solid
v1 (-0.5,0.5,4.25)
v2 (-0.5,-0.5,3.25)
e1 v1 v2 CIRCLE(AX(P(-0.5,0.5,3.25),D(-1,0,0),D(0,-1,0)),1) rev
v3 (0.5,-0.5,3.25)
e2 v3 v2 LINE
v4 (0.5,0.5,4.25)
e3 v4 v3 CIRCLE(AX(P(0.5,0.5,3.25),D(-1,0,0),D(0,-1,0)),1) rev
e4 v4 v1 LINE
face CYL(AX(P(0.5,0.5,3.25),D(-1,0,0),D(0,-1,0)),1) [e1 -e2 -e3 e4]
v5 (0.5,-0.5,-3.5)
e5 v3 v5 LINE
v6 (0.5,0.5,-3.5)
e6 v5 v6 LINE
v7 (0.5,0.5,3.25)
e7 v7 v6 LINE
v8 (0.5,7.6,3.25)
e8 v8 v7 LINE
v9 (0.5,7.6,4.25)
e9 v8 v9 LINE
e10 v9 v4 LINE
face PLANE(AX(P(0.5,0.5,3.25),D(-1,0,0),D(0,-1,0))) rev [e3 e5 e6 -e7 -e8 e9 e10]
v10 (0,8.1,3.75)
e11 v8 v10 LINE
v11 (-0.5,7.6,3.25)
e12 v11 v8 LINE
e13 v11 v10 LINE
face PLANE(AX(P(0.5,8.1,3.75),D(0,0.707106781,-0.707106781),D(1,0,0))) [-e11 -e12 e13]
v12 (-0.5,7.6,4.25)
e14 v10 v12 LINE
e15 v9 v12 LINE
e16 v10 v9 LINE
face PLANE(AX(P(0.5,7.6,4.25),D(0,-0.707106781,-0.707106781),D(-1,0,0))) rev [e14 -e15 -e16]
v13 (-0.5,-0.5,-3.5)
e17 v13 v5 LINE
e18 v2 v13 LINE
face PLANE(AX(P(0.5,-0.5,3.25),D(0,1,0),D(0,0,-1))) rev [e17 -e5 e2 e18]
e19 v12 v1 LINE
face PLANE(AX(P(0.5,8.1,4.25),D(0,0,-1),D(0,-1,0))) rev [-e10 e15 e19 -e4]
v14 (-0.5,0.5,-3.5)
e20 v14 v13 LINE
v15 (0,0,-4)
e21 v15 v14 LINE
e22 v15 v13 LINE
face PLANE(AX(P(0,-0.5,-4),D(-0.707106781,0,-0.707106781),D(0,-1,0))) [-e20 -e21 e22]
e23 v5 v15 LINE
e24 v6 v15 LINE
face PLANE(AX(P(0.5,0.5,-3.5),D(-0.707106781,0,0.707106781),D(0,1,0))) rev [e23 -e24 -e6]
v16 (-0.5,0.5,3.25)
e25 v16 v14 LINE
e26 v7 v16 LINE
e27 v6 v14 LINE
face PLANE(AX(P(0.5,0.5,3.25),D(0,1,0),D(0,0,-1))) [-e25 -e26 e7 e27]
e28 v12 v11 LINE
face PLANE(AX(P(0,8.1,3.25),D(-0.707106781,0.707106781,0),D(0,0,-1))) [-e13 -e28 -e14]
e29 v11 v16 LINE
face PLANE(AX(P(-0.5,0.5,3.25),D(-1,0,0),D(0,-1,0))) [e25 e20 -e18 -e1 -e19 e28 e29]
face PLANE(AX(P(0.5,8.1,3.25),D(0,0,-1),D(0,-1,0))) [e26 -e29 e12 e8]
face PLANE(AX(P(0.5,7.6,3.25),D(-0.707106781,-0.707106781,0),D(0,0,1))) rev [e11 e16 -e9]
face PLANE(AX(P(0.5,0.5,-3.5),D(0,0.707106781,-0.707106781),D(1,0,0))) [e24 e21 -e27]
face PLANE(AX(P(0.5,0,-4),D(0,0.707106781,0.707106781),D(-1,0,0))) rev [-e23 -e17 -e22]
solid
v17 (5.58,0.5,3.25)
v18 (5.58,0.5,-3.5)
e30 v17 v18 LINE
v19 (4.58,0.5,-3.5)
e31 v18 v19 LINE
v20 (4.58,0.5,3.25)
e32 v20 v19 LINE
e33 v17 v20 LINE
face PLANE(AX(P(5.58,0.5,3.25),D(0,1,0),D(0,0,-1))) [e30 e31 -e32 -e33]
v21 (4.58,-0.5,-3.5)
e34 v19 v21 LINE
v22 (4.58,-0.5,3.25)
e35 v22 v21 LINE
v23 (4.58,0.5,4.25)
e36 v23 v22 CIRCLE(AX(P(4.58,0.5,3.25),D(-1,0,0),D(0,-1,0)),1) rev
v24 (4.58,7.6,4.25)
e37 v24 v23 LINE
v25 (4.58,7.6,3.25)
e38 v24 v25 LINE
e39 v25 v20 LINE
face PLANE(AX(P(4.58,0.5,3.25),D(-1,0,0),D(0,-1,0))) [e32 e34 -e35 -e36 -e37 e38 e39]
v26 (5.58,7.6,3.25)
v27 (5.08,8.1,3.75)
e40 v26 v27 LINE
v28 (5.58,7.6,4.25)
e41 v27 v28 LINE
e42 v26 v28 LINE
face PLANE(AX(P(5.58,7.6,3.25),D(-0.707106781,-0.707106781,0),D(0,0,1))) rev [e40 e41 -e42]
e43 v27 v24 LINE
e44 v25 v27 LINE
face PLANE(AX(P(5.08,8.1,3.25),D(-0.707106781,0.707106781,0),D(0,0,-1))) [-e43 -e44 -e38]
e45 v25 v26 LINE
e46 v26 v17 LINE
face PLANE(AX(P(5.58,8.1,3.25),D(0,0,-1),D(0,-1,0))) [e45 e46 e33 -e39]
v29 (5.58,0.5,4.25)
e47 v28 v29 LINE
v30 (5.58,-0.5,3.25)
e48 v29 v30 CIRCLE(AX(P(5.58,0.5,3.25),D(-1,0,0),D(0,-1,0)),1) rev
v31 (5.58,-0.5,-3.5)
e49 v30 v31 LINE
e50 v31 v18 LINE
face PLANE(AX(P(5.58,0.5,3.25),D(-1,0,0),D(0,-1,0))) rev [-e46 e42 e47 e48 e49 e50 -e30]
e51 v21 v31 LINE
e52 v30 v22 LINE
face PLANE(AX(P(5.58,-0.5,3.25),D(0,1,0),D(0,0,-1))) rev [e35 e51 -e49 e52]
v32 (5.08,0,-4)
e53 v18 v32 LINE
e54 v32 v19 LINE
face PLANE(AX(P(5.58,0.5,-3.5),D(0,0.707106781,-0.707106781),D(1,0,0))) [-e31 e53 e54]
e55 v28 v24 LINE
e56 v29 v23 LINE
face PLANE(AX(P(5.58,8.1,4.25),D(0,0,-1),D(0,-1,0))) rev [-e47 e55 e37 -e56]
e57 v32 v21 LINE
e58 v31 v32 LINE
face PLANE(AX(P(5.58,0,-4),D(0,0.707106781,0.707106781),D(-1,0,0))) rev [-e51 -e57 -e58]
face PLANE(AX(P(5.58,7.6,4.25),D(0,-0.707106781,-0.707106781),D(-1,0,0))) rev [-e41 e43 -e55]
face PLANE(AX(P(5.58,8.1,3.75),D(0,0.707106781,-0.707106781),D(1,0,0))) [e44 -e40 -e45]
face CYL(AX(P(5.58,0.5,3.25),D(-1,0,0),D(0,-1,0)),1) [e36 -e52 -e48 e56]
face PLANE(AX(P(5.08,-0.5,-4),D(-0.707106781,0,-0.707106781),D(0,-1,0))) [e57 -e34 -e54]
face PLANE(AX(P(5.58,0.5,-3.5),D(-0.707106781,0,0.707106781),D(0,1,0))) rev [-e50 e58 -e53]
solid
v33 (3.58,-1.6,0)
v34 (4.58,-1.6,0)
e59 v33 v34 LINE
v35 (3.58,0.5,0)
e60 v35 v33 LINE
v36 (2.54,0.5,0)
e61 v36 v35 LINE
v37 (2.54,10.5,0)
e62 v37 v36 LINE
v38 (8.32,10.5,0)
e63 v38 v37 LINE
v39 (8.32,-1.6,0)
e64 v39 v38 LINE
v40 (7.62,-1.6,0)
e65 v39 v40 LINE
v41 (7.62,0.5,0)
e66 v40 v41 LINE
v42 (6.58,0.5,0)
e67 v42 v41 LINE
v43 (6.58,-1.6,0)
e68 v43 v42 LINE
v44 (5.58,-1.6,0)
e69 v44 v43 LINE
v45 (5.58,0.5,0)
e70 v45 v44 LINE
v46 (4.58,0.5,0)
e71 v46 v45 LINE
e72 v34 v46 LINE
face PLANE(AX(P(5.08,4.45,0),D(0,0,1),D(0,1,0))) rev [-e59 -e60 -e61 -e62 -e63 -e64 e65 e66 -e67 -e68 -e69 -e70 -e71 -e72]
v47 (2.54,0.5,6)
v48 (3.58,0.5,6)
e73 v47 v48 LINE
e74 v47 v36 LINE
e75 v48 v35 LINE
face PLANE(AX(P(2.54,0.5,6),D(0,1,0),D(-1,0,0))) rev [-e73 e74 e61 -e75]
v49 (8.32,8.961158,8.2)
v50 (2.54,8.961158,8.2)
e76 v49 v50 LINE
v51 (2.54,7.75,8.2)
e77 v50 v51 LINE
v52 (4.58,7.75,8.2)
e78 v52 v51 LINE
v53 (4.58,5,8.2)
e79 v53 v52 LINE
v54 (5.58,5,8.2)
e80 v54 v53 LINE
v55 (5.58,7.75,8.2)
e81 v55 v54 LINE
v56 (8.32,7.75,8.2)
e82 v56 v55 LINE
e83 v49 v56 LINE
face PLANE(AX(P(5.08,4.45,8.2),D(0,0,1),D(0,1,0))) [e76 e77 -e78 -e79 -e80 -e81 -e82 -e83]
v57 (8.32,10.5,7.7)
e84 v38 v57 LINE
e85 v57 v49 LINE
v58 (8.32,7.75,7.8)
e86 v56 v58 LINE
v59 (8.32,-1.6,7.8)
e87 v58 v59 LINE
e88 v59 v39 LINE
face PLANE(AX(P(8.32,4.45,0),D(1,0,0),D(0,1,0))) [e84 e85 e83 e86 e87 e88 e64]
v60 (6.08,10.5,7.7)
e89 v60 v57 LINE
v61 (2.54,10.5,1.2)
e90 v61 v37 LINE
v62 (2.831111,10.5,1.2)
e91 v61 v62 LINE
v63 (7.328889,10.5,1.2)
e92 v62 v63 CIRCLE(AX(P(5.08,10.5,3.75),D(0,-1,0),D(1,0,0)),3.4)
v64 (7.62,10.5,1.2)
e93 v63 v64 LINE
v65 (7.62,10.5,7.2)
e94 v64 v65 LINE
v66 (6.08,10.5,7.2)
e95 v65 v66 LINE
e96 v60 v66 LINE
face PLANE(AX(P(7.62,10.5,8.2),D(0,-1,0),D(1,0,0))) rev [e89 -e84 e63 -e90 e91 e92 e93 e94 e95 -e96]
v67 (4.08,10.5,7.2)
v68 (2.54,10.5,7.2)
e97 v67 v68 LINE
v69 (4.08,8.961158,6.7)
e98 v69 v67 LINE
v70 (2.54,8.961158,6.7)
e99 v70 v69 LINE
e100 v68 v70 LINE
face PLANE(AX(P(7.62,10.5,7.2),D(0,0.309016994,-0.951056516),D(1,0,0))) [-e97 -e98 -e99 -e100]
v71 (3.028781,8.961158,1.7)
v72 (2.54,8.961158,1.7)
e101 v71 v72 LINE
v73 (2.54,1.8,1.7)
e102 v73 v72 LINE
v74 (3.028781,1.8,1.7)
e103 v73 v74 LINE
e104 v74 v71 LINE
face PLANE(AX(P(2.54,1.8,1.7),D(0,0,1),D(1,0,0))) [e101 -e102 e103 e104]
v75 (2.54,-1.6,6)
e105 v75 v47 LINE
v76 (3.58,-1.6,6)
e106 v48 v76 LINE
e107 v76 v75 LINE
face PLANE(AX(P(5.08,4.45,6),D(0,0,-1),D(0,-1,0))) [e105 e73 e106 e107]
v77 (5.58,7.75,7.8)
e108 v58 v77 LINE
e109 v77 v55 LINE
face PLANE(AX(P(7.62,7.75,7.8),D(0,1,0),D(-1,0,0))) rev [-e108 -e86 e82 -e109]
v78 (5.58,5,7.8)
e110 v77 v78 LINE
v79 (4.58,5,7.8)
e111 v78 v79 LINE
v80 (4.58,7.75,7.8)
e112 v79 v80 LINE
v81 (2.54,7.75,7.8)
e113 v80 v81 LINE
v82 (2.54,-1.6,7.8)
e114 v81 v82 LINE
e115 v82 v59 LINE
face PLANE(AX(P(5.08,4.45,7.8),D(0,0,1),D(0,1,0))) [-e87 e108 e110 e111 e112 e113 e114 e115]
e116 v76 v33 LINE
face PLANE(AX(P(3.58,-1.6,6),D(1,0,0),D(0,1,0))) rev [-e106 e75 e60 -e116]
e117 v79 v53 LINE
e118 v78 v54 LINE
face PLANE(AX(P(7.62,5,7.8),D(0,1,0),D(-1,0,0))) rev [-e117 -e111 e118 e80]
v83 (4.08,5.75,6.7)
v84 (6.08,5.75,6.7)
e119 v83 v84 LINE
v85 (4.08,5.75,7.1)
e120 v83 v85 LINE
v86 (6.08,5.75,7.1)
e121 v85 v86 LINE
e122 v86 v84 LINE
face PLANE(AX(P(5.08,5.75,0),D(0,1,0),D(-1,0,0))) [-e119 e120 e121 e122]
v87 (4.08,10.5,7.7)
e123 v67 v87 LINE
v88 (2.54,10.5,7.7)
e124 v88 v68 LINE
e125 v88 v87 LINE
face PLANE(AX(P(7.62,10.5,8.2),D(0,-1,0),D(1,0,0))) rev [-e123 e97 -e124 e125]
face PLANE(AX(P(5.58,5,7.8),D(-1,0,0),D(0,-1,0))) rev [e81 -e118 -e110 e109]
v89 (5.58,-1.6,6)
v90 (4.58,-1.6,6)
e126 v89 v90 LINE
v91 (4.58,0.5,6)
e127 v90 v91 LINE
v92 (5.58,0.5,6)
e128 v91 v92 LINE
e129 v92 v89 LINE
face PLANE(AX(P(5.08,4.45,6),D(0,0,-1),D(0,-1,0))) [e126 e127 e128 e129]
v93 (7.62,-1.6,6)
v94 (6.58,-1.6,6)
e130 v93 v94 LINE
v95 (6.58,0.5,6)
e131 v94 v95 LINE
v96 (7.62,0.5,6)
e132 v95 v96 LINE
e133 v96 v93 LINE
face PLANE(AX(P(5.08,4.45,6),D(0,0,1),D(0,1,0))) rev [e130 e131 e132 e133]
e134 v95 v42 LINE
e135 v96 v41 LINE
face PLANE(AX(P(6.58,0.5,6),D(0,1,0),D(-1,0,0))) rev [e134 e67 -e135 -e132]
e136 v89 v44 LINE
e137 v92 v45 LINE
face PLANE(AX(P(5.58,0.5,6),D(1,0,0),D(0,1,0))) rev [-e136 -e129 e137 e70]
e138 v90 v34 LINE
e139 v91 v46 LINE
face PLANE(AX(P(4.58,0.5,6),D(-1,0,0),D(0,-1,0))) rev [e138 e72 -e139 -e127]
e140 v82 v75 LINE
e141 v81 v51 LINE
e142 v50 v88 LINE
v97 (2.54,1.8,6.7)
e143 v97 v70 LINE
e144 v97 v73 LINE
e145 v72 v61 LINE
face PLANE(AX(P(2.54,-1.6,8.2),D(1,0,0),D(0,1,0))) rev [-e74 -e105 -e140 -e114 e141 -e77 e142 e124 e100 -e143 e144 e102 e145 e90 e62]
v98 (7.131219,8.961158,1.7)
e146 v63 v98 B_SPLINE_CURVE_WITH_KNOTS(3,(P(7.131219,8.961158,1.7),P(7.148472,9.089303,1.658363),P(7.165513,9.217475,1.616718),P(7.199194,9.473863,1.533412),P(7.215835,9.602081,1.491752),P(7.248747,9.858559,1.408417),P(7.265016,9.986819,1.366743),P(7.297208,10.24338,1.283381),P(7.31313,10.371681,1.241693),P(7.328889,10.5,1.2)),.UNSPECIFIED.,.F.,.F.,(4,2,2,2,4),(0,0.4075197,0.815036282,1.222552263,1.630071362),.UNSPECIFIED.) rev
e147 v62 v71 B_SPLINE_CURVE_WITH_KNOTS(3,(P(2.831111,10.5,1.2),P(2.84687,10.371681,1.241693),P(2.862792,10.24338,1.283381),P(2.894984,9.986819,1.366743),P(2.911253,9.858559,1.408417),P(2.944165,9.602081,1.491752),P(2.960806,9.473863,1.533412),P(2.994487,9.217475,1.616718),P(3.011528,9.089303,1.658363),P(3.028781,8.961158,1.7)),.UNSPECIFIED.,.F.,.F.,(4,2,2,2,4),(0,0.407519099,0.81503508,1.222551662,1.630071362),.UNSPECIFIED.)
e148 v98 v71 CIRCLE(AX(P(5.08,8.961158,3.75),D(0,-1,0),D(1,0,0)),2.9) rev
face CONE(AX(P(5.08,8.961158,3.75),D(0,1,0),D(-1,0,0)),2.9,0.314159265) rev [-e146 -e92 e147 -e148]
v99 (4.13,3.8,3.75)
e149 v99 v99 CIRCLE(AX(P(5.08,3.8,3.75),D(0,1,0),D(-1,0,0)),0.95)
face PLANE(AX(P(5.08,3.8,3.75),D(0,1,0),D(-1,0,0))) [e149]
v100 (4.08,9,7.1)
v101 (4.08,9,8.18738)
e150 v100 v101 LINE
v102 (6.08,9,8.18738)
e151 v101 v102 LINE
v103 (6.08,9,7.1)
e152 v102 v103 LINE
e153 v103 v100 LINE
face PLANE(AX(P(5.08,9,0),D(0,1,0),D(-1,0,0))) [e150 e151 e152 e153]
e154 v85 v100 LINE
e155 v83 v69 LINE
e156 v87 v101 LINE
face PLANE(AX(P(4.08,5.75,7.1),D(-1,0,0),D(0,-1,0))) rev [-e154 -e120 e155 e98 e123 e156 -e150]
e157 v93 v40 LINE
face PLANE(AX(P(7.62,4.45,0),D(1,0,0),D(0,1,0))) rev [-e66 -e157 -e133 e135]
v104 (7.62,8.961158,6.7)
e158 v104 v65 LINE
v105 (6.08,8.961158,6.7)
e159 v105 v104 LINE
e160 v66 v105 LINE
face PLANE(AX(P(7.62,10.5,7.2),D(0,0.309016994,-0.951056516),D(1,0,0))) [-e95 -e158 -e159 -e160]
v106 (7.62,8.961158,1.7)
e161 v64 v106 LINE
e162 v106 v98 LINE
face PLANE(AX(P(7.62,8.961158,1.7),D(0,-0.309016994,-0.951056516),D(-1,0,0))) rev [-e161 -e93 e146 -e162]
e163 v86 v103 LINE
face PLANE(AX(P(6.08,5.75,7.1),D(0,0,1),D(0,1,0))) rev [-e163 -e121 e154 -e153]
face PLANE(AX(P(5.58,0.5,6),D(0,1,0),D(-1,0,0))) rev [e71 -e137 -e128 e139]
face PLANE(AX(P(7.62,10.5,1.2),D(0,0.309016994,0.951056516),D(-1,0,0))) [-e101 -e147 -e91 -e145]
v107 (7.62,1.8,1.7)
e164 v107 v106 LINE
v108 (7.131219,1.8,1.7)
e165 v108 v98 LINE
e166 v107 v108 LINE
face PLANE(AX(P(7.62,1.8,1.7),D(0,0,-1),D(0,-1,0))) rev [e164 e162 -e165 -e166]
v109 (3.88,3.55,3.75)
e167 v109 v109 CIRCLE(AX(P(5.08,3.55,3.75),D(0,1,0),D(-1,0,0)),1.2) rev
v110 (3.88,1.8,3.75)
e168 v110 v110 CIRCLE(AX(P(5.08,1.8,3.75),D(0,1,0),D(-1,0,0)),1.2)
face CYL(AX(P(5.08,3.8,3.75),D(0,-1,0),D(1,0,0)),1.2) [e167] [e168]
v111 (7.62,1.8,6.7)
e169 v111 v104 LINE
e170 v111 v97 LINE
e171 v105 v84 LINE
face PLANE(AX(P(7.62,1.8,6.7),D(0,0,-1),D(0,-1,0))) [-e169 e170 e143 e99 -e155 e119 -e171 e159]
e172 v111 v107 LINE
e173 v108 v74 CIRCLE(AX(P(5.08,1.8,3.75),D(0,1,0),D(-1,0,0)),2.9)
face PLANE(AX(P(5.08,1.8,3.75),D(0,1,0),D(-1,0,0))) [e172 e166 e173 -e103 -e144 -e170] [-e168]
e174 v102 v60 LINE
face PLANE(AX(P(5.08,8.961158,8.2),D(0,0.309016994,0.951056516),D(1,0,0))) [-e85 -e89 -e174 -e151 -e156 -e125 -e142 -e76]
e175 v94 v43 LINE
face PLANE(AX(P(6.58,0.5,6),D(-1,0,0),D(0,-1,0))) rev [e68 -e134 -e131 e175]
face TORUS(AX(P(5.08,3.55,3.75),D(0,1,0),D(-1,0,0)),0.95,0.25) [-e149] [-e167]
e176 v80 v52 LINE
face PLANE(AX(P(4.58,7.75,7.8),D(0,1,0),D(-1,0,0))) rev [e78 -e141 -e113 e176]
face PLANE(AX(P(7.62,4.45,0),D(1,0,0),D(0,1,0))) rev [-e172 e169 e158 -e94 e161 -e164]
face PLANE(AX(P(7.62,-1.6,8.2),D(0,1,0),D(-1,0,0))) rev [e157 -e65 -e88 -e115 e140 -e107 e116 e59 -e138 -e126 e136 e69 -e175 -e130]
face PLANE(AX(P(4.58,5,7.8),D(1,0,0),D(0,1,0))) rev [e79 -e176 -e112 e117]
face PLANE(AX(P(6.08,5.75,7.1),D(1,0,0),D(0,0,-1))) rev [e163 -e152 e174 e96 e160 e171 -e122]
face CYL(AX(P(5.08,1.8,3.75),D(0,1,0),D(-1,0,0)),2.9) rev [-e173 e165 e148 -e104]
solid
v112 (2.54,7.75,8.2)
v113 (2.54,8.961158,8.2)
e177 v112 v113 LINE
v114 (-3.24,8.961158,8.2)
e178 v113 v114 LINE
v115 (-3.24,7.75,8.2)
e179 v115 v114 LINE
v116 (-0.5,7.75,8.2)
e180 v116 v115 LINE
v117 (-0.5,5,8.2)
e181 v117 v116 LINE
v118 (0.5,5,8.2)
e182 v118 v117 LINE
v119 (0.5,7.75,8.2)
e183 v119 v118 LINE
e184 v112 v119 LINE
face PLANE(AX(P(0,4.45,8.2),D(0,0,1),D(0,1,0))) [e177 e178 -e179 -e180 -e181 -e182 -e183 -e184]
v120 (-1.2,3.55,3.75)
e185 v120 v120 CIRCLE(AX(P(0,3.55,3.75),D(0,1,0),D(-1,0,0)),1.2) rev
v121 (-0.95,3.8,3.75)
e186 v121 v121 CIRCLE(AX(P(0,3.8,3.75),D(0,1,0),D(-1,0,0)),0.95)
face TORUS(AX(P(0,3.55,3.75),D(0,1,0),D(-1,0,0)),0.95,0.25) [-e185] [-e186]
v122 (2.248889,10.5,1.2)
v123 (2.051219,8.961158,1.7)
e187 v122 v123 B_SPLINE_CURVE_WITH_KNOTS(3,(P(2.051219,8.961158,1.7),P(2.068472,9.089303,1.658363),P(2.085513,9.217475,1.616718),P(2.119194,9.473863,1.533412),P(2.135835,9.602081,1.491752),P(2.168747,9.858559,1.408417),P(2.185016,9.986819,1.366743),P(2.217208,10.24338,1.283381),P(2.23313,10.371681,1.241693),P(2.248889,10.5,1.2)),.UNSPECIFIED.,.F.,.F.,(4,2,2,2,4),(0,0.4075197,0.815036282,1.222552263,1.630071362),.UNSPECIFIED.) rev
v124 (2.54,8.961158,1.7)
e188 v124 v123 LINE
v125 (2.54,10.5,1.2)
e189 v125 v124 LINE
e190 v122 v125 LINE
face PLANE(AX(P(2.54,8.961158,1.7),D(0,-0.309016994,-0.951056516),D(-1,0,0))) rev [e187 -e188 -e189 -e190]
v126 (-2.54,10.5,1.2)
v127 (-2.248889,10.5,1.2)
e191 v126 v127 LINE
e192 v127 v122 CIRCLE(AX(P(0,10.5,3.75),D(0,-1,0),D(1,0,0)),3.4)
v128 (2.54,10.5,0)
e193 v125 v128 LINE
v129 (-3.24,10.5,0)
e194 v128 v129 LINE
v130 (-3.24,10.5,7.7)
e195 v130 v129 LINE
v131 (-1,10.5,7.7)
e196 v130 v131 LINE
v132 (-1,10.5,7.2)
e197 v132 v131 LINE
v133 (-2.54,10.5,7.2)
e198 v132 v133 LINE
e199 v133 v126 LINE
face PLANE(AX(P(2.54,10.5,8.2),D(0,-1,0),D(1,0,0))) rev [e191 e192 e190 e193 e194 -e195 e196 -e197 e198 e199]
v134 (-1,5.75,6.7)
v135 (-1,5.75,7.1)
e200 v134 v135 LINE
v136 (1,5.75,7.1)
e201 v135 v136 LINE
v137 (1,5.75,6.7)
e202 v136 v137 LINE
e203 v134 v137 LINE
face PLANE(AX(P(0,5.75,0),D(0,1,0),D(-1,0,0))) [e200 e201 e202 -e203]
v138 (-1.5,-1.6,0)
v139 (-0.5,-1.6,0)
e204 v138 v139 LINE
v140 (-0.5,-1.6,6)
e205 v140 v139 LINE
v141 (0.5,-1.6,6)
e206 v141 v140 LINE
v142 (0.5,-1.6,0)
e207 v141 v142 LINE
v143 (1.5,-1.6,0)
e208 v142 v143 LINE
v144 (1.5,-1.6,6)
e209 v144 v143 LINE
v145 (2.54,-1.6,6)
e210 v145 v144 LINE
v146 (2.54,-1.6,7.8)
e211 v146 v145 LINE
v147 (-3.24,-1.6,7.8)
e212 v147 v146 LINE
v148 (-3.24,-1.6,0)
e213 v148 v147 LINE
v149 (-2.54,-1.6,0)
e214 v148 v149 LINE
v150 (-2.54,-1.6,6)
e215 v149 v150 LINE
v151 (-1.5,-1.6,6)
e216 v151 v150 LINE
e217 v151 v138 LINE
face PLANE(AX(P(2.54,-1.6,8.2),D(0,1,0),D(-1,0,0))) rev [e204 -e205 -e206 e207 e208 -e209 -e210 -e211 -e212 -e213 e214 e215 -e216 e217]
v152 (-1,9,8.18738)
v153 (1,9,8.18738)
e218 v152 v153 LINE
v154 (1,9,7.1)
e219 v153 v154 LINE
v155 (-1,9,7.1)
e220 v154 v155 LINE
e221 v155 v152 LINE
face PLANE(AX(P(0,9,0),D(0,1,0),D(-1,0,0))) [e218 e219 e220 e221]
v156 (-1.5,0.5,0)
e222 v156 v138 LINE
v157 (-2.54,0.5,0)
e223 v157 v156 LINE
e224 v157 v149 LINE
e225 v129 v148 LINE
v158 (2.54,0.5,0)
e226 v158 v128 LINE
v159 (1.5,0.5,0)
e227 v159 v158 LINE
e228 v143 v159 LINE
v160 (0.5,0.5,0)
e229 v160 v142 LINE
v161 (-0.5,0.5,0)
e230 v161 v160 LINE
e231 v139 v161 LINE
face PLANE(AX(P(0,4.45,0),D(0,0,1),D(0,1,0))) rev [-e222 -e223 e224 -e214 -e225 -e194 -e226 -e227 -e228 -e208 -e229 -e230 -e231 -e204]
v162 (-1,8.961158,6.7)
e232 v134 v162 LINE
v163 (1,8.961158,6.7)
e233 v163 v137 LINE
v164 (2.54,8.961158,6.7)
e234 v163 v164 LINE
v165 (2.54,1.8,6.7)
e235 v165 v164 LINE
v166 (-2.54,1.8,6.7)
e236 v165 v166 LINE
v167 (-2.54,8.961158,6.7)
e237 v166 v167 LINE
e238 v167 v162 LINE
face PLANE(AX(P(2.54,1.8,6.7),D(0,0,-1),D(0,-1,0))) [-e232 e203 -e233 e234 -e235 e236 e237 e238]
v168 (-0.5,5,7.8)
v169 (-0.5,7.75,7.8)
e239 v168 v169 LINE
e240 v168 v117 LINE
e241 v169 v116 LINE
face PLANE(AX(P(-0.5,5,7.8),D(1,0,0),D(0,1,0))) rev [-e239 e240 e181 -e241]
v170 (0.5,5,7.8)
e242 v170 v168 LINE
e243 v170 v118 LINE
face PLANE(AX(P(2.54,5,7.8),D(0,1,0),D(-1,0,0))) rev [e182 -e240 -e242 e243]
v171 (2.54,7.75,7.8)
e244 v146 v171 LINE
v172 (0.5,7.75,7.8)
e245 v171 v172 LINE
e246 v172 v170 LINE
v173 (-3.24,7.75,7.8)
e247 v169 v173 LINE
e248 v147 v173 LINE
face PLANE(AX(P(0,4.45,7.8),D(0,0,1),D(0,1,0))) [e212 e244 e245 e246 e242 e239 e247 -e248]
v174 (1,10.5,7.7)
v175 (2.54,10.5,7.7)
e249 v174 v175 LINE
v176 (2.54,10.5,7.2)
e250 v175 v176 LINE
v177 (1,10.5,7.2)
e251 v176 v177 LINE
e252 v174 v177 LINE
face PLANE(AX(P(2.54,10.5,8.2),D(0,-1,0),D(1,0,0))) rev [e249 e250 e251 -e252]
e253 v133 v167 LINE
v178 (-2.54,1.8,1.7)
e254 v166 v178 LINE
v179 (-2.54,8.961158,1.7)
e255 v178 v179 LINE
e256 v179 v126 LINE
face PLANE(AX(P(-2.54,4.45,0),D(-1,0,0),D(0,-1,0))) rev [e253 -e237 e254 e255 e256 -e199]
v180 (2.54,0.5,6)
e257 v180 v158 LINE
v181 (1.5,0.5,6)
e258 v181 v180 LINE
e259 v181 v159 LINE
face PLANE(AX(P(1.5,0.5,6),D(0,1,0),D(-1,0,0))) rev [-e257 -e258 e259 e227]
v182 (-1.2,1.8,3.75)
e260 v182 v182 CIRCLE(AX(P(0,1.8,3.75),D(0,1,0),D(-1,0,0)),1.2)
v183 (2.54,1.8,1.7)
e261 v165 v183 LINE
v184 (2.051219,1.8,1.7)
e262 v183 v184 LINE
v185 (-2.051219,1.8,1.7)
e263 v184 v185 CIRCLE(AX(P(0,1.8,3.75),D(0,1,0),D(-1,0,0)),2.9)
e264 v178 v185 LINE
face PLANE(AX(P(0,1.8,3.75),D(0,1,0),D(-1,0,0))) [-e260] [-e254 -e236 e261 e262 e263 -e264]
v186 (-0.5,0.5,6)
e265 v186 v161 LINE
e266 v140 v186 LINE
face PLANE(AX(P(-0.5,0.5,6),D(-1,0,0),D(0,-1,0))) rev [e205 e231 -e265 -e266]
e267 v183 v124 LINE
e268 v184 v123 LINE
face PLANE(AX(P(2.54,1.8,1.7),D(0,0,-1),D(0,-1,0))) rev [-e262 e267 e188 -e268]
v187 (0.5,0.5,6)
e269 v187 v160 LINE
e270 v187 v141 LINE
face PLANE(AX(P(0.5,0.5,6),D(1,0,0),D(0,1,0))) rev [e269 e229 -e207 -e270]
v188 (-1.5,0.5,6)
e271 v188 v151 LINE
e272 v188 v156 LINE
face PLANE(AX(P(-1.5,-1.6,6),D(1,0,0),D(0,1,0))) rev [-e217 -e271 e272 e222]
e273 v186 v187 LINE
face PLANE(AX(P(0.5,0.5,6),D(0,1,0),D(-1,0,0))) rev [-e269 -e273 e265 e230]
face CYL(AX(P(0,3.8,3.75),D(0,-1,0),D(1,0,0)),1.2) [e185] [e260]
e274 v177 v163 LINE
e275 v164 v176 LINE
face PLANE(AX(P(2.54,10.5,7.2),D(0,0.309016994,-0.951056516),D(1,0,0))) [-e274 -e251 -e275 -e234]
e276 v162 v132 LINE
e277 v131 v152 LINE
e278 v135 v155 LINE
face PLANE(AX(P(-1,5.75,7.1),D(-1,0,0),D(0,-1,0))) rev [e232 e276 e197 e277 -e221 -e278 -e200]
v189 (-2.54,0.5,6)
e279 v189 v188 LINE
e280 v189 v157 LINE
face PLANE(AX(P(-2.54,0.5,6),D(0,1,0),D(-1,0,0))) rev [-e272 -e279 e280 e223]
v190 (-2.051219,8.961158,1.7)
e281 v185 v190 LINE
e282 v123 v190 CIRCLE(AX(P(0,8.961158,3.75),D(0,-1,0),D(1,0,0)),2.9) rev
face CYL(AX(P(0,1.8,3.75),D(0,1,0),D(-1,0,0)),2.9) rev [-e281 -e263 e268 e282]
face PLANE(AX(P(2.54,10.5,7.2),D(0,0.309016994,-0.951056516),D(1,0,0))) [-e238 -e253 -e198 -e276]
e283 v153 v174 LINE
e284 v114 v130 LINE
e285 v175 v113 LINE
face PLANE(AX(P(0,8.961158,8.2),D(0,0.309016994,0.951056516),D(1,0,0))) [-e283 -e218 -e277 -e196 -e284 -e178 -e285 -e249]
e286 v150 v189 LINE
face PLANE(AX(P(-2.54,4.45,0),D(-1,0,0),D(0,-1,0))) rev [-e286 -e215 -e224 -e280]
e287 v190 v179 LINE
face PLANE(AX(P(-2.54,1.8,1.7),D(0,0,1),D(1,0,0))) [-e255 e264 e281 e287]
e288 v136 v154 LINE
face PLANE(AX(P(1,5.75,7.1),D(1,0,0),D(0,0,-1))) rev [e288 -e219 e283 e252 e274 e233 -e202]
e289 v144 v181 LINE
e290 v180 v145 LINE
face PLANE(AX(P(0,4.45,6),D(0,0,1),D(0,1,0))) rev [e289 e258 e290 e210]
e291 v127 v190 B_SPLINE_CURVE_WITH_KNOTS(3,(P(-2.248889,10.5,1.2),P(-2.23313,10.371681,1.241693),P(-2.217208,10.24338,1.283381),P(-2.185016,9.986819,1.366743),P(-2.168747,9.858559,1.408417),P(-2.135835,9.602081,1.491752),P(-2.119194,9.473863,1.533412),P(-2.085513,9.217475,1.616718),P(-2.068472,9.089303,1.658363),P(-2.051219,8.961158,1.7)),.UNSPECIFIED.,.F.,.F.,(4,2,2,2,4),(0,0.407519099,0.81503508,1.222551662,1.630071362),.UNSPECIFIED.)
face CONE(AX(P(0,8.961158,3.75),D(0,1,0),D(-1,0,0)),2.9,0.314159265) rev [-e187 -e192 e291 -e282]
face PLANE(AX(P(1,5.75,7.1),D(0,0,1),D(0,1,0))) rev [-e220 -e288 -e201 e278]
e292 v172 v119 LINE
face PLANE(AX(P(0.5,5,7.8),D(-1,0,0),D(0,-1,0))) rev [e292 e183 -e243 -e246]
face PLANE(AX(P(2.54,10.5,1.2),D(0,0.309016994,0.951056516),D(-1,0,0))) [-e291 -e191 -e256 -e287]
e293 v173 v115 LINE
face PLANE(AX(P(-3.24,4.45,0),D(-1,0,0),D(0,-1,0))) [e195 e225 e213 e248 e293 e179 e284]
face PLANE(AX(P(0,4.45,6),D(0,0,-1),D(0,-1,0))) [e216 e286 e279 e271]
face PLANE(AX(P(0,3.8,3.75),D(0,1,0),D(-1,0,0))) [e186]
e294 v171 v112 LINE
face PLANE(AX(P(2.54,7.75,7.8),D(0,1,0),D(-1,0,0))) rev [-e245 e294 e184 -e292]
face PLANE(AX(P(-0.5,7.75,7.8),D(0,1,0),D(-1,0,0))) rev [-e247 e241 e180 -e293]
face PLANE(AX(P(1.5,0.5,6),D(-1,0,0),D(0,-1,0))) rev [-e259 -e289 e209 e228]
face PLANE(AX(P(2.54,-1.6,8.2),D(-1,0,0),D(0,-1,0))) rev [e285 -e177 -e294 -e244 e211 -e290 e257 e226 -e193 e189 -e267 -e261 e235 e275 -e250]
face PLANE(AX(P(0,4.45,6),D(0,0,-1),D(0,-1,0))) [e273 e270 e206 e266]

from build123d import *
from OCP.BRepFilletAPI import BRepFilletAPI_MakeChamfer

# Parameters (mm, degrees)
SKETCH_1_W             = 5.08
SKETCH_1_H             = 12.1
EXTRUDE_1_DEPTH        = 8.2
CUT_EXTRUDE_1_DEPTH    = 8.7
SKETCH_3_R             = 1.2
EXTRUDE_2_DEPTH        = 2
FILLET_1_R             = 0.25
CHAMFER_1_SIZE         = 0.5
CHAMFER_1_SIZE2        = 1.538841769
SKETCH_4_W             = 2
SKETCH_4_H             = 1.010953213
CUT_EXTRUDE_2_DEPTH    = 4.75
SKETCH_5_W             = 2
SKETCH_5_H             = 1.705458635
CUT_EXTRUDE_3_DEPTH    = 1.5
CHAMFER_2_SIZE         = 0.5
CHAMFER_2_SIZE2        = 1.538841769
SKETCH_6_W             = 5.08
SKETCH_6_H             = 6.6
CUT_EXTRUDE_4_DEPTH    = 0.4
SKETCH_7_W             = 2.04
SKETCH_7_H             = 2.75
CUT_EXTRUDE_5_DEPTH    = 0.4
EXTRUDE_1_2_DEPTH      = 0.5
EXTRUDE_1_2_DEPTH_BACK = 0.5
CHAMFER_3_SIZE         = 0.5
SKETCH_9_W             = 1
SKETCH_9_H             = 2.1
SKETCH_9_W_2           = 1.04
CUT_EXTRUDE_6_DEPTH    = 6
PATTERN_LINEAR_1_COUNT = 2
PATTERN_LINEAR_1_PITCH = 5.08
EXTRUDE_3_DEPTH        = 0.7
EXTRUDE_4_DEPTH        = 0.7
MOVE_BODY_1_ANGLE      = 180


with BuildPart() as part:
    # Эскиз1 → Extrude 1 (new body)
    with BuildSketch(Plane(origin=(0, 0, 0), x_dir=(1, 0, 0), z_dir=(0, 1, 0))):
        Rectangle(SKETCH_1_W, SKETCH_1_H)
    extrude(amount=EXTRUDE_1_DEPTH)

    # Эскиз2 → Вырез-Вытянуть1 (cut)
    with BuildSketch(Plane.XY.offset(6.05)):
        with BuildLine():
            Line((-2.54, 6.7), (2.54, 6.7))
            Line((2.54, 6.7), (2.54, 1.7))
            Line((2.54, 1.7), (2.05121915, 1.7))
            ThreePointArc((2.05121915, 1.7), (0, 0.85), (-2.05121915, 1.7))
            Line((-2.05121915, 1.7), (-2.54, 1.7))
            Line((-2.54, 1.7), (-2.54, 6.7))
        make_face()
    extrude(amount=-CUT_EXTRUDE_1_DEPTH, mode=Mode.SUBTRACT)

    # Эскиз3 → Бобышка-Вытянуть2 (add)
    with BuildSketch(Plane.XY.offset(-2.65)):
        with Locations((0, 3.75)):
            Circle(SKETCH_3_R)
    extrude(amount=EXTRUDE_2_DEPTH)

    # Скругление1
    fillet_1_edges = [part.edges().sort_by_distance(p)[0] for p in [
        (-1.2, 3.75, -0.65),
    ]]
    fillet(fillet_1_edges, radius=FILLET_1_R)

    # Фаска1: one chamfer whose edges measure the first distance from different faces: ONE call of the kernel's chamfer builder (chamfer() names one face for all edges)
    chamfer_1_edges_1 = [part.edges().sort_by_distance(p)[0] for p in [
        (0, 6.7, 6.05),
    ]]
    chamfer_1_side_1 = [part.faces().sort_by_distance(p)[0] for p in [
        (0, 7.45, 6.05),
    ]]
    chamfer_1_edges_2 = [part.edges().sort_by_distance(p)[0] for p in [
        (2.295609575, 1.7, 6.05),
        (-2.295609575, 1.7, 6.05),
        (0, 0.85, 6.05),
    ]]
    chamfer_1_side_2 = [part.faces().sort_by_distance(p)[0] for p in [
        (0, 0.655214235, 6.05),
    ]]
    chamfer_1 = BRepFilletAPI_MakeChamfer(part.part.solid().wrapped)
    for e in chamfer_1_edges_1:
        chamfer_1.Add(CHAMFER_1_SIZE, CHAMFER_1_SIZE2, e.wrapped, chamfer_1_side_1[0].wrapped)  # the first distance lies on this face
    for e in chamfer_1_edges_2:
        chamfer_1.Add(CHAMFER_1_SIZE, CHAMFER_1_SIZE2, e.wrapped, chamfer_1_side_2[0].wrapped)  # the first distance lies on this face
    add(Compound.cast(chamfer_1.Shape()), mode=Mode.REPLACE)

    # Эскиз4 → Вырез-Вытянуть2 (cut)
    with BuildSketch(Plane.XY.offset(6.05)):
        with Locations((0, 6.594523394)):
            Rectangle(SKETCH_4_W, SKETCH_4_H)
    extrude(amount=-CUT_EXTRUDE_2_DEPTH, mode=Mode.SUBTRACT)

    # Эскиз5 → Вырез-Вытянуть3 (cut)
    with BuildSketch(Plane.XY.offset(6.05)):
        with Locations((0, 7.552729318)):
            Rectangle(SKETCH_5_W, SKETCH_5_H)
    extrude(amount=-CUT_EXTRUDE_3_DEPTH, mode=Mode.SUBTRACT)

    # Фаска2
    chamfer_2_edges = [part.edges().sort_by_distance(p)[0] for p in [
        (-1.77, 8.2, 6.05),
    ]]
    chamfer_2_side = [part.faces().sort_by_distance(p)[0] for p in [
        (-1.77, 7.7, 6.05),
    ]]
    chamfer(chamfer_2_edges, length=CHAMFER_2_SIZE, length2=CHAMFER_2_SIZE2, reference=chamfer_2_side[0])

    # Эскиз6 → Вырез-Вытянуть4 (cut)
    with BuildSketch(Plane(origin=(0, 8.2, 0), x_dir=(1, 0, 0), z_dir=(0, 1, 0))):
        with Locations((0, 2.75)):
            Rectangle(SKETCH_6_W, SKETCH_6_H)
    extrude(amount=-CUT_EXTRUDE_4_DEPTH, mode=Mode.SUBTRACT)

    # Эскиз7 → Вырез-Вытянуть5 (cut)
    with BuildSketch(Plane(origin=(0, 8.2, 0), x_dir=(1, 0, 0), z_dir=(0, 1, 0))):
        with Locations((1.52, -1.925)):
            Rectangle(SKETCH_7_W, SKETCH_7_H)
        with Locations((-1.52, -1.925)):
            Rectangle(SKETCH_7_W, SKETCH_7_H)
    extrude(amount=-CUT_EXTRUDE_5_DEPTH, mode=Mode.SUBTRACT)

    # Эскиз9 → Вырез-Вытянуть6 (cut)
    with BuildSketch(Plane.XZ):
        with Locations((0, -5)):
            Rectangle(SKETCH_9_W, SKETCH_9_H)
        with Locations((-2.02, -5)):
            Rectangle(SKETCH_9_W_2, SKETCH_9_H)
        with Locations((2.02, -5)):
            Rectangle(SKETCH_9_W_2, SKETCH_9_H)
    extrude(amount=-CUT_EXTRUDE_6_DEPTH, mode=Mode.SUBTRACT)


with BuildPart() as body_2:
    # Эскиз8 → Extrude 1 2 (new, two sides: drawn at the far end of the back side and taken through both)
    with BuildSketch(Plane(origin=(0, 0, 0), x_dir=(0, 0, -1), z_dir=(1, 0, 0)).offset(-EXTRUDE_1_2_DEPTH_BACK)):
        with BuildLine():
            Line((-3.65, 3.25), (3.95, 3.25))
            Line((3.95, 3.25), (3.95, -4))
            Line((3.95, -4), (4.95, -4))
            Line((4.95, -4), (4.95, 3.25))
            ThreePointArc((4.95, 3.25), (4.657106781, 3.957106781), (3.95, 4.25))
            Line((3.95, 4.25), (-3.65, 4.25))
            Line((-3.65, 4.25), (-3.65, 3.25))
        make_face()
    extrude(amount=EXTRUDE_1_2_DEPTH + EXTRUDE_1_2_DEPTH_BACK)

    # Фаска3
    chamfer_3_edges = [body_2.edges().sort_by_distance(p)[0] for p in [
        (0, 3.25, 3.65),
        (0, 4.25, 3.65),
        (0, -4, -4.95),
        (0, -4, -3.95),
        (0.5, -4, -4.45),
        (0.5, 3.75, 3.65),
        (-0.5, 3.75, 3.65),
        (-0.5, -4, -4.45),
    ]]
    chamfer(chamfer_3_edges, length=CHAMFER_3_SIZE - 0.0001)  # a hair under: the kernel refuses the full size


with BuildPart() as pattern_linear_1_1:
    # Линейный массив1: pattern copy
    add(body_2.part.moved(Location(Vector(-1, 0, 0) * (1 * PATTERN_LINEAR_1_PITCH))))


with BuildPart() as pattern_linear_1_2:
    # Линейный массив1: pattern copy
    add(part.part.moved(Location(Vector(-1, 0, 0) * (1 * PATTERN_LINEAR_1_PITCH))))

    # Эскиз11 → Бобышка-Вытянуть4 (add)
    with BuildSketch(Plane.ZY.offset(7.62)):
        Polygon((-6.05, 7.8), (-6.05, 0), (6.05, 0), (6.05, 7.7), (4.511158231, 8.2), (3.3, 8.2), (3.3, 7.8), align=None)
    extrude(amount=EXTRUDE_4_DEPTH)


with BuildPart() as part_1:
    add(part.part)

    # Эскиз10 → Бобышка-Вытянуть3 (add)
    with BuildSketch(Plane(origin=(2.54, 0, 0), x_dir=(0, 0, -1), z_dir=(1, 0, 0))):
        Polygon((6.05, 7.8), (-3.3, 7.8), (-3.3, 8.2), (-4.511158231, 8.2), (-6.05, 7.7), (-6.05, 0), (6.05, 0), align=None)
    extrude(amount=EXTRUDE_3_DEPTH)


with BuildPart() as body_2_1:
    # Move Body 1: moved
    add(body_2.part.rotate(Axis((0, 0, 0), (0, 0.7071067811865488, 0.7071067811865462)), MOVE_BODY_1_ANGLE))


with BuildPart() as pattern_linear_1_1_1:
    # Move Body 1: moved
    add(pattern_linear_1_1.part.rotate(Axis((0, 0, 0), (0, 0.7071067811865488, 0.7071067811865462)), MOVE_BODY_1_ANGLE))


with BuildPart() as part_2:
    # Move Body 1: moved
    add(part_1.part.rotate(Axis((0, 0, 0), (0, 0.7071067811865488, 0.7071067811865462)), MOVE_BODY_1_ANGLE))


with BuildPart() as pattern_linear_1_2_1:
    # Move Body 1: moved
    add(pattern_linear_1_2.part.rotate(Axis((0, 0, 0), (0, 0.7071067811865488, 0.7071067811865462)), MOVE_BODY_1_ANGLE))


with BuildPart() as pattern_linear_1_2_2:
    # Move Body 2: read off the stored shape, not the designer's step
    # Move Body 2: moved
    add(pattern_linear_1_2_1.part.moved(Location((0, 4.45, 0))))


with BuildPart() as part_3:
    # Move Body 2 2: moved
    add(part_2.part.moved(Location((0, 4.45, 0))))


with BuildPart() as pattern_linear_1_1_2:
    # Move Body 2 3: moved
    add(pattern_linear_1_1_1.part.moved(Location((0, 4.45, 0))))


with BuildPart() as body_2_2:
    # Move Body 2 4: moved
    add(body_2_1.part.moved(Location((0, 4.45, 0))))


solid = Compound([pattern_linear_1_2_2.part, part_3.part, pattern_linear_1_1_2.part, body_2_2.part])
